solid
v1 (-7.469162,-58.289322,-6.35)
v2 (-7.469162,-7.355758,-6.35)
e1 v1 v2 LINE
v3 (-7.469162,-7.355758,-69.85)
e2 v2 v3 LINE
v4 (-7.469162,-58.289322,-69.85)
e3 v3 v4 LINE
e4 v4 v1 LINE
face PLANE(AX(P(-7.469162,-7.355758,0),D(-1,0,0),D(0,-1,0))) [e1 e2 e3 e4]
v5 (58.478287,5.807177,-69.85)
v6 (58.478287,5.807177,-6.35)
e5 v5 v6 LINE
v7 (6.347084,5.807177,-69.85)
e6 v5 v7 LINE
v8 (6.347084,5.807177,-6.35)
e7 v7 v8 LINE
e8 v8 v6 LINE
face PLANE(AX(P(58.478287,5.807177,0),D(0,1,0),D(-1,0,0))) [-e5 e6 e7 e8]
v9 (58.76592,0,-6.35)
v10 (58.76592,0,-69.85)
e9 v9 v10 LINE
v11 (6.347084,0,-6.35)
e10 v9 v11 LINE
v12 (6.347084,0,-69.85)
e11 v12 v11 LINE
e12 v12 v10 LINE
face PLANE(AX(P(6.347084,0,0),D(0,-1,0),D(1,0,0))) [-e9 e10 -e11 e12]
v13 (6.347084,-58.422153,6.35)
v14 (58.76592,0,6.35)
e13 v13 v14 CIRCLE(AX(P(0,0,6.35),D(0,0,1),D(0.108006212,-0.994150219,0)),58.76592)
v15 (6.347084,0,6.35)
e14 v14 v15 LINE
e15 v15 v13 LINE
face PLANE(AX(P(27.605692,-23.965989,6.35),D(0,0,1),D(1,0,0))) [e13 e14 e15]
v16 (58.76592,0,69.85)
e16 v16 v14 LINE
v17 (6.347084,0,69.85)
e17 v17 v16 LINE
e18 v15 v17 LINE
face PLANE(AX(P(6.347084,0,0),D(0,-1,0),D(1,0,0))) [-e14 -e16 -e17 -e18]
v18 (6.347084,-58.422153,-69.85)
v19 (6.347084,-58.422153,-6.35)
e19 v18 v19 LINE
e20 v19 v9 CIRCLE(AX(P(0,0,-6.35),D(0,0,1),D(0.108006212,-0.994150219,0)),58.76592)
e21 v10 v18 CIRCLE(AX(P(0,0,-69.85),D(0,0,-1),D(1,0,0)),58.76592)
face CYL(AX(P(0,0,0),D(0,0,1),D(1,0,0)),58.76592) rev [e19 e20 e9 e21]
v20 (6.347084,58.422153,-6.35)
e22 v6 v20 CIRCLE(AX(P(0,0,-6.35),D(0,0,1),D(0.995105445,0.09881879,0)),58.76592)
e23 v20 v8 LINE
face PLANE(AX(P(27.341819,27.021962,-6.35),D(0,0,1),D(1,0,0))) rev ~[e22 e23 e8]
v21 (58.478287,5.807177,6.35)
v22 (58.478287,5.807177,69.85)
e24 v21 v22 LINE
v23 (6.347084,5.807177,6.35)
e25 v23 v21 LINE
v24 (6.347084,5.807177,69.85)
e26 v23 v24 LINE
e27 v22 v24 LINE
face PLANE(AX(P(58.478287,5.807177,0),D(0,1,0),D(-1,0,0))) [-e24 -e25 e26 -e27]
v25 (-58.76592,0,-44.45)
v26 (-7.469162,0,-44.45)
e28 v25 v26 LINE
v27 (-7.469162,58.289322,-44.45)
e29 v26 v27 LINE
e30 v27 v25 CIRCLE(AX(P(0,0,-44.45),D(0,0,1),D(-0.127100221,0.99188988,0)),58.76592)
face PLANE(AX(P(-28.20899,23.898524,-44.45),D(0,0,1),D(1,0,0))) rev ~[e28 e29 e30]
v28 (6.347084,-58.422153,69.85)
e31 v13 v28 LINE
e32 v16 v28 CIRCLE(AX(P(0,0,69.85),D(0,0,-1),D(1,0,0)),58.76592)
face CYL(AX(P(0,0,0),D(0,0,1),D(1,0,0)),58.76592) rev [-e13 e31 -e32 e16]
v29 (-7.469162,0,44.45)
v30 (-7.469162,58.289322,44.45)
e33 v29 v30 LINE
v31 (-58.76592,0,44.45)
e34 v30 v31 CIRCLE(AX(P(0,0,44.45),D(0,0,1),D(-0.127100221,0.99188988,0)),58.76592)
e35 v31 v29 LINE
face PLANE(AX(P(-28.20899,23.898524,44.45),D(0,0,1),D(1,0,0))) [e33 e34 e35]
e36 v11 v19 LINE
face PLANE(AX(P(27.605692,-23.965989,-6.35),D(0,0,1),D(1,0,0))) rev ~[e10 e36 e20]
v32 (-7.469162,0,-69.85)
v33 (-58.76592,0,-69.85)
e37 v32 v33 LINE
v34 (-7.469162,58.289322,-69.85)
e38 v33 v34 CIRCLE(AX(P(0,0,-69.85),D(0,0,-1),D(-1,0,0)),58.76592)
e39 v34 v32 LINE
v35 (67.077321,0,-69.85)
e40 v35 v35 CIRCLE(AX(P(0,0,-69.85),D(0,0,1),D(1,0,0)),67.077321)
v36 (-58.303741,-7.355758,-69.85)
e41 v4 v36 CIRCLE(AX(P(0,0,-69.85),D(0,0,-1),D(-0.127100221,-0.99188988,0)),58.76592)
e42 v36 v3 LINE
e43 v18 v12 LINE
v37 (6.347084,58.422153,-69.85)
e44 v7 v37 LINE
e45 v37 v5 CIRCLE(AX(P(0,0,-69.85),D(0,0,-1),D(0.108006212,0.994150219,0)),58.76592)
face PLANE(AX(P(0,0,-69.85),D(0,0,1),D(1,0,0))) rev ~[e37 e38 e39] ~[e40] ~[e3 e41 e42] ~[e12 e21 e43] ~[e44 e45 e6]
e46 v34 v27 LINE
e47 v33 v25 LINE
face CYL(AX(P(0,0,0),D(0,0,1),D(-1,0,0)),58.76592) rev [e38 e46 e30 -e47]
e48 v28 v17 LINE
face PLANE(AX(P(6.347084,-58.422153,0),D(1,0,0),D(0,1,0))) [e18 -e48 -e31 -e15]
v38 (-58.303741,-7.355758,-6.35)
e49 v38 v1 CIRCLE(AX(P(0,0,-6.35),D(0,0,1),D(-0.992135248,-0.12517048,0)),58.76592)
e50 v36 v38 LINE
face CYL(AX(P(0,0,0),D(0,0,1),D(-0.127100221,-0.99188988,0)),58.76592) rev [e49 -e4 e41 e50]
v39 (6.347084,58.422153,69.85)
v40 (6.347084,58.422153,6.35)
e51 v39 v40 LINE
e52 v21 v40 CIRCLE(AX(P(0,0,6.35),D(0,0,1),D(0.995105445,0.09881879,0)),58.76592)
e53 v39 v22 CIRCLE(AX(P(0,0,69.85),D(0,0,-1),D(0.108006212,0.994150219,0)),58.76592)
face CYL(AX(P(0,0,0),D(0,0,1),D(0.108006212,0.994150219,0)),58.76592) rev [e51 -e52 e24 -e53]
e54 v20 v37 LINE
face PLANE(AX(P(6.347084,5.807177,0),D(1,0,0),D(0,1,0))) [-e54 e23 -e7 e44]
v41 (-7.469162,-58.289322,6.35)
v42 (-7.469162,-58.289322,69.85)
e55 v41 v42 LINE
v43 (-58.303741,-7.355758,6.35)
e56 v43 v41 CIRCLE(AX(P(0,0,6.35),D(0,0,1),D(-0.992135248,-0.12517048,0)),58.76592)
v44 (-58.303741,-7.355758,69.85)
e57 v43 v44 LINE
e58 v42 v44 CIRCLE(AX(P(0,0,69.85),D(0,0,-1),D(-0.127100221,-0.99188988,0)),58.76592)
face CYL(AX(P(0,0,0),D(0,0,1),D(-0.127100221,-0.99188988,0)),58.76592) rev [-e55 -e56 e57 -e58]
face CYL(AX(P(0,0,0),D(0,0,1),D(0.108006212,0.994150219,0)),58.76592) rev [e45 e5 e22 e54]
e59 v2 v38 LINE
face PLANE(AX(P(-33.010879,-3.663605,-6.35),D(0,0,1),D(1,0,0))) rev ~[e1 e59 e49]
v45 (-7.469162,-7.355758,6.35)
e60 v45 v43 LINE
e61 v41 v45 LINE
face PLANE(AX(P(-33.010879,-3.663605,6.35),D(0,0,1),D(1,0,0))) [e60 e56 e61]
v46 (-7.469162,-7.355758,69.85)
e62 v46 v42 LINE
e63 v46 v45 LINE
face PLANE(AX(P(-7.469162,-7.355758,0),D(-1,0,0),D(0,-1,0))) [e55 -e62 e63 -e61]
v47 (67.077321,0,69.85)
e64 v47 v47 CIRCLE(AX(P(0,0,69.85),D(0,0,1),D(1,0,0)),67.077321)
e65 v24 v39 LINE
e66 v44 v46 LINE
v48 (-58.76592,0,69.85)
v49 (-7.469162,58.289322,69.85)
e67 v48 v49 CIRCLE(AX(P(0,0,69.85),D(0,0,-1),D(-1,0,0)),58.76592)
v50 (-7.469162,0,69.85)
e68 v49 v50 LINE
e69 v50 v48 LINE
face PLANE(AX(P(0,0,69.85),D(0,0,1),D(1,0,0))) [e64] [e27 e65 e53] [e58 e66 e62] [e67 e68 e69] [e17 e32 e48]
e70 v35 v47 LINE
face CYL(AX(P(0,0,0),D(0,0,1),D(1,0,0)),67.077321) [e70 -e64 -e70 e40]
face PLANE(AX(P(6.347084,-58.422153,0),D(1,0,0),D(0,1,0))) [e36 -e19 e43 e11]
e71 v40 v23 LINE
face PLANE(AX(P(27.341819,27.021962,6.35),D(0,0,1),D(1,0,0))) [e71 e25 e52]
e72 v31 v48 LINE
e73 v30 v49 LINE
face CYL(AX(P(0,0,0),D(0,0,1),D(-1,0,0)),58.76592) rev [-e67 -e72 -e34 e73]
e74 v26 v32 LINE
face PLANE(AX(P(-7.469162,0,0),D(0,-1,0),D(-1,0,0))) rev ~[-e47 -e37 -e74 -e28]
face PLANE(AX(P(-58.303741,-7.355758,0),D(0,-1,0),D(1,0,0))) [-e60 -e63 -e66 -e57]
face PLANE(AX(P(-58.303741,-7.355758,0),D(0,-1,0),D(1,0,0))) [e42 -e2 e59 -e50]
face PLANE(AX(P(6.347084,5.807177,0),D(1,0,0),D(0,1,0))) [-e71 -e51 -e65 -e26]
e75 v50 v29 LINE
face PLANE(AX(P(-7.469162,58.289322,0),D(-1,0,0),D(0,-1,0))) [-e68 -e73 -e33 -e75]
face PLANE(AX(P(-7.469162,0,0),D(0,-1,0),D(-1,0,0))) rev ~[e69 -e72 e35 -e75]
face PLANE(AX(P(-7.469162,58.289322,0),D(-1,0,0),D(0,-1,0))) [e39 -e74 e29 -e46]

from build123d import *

# Parameters (mm, degrees)
F0_R     = 67.0773206954
F1_DEPTH = 69.85
F2_DEPTH = 6.35
F3_DEPTH = 44.45


# Not quite as in the source:
# - a feature names something its author has since deleted; it is built from what else it names


with BuildPart() as f1:
    # F0 (on Top) → F1 (new body, symmetric)
    with BuildSketch(Plane.XY):
        Circle(F0_R)
        with BuildLine():
            ThreePointArc((58.4782874441, 5.8071771637), (58.6939681668, 2.9071480599), (58.7659204727, 0))
            ThreePointArc((58.7659204727, 0), (43.7402884604, -39.2456440183), (6.3470844528, -58.4221527159))
            ThreePointArc((6.3470844528, -58.4221527159), (-0.5649559649, -58.7632047608), (-7.469161507, -58.2893217956))
            ThreePointArc((-7.469161507, -58.2893217956), (-41.5941780551, -41.5133443718), (-58.3037411026, -7.3557584547))
            ThreePointArc((-58.3037411026, -7.3557584547), (-58.6502618149, -3.6851320266), (-58.7659204727, 0))
            ThreePointArc((-58.7659204727, 0), (-44.1155616542, 38.8233258357), (-7.469161507, 58.2893217956))
            ThreePointArc((-7.469161507, 58.2893217956), (-0.5649559649, 58.7632047608), (6.3470844528, 58.4221527159))
            ThreePointArc((6.3470844528, 58.4221527159), (41.745252706, 41.3614226729), (58.4782874441, 5.8071771637))
        make_face(mode=Mode.SUBTRACT)
        with BuildLine():
            ThreePointArc((-7.469161507, -58.2893217956), (-0.5649559649, -58.7632047608), (6.3470844528, -58.4221527159))
            Line((6.3470844528, -58.4221527159), (6.3470844528, 0))
            Line((6.3470844528, 0), (6.3470844528, 5.8071771637))
            Line((6.3470844528, 5.8071771637), (6.3470844528, 58.4221527159))
            ThreePointArc((6.3470844528, 58.4221527159), (-0.5649559649, 58.7632047608), (-7.469161507, 58.2893217956))
            Line((-7.469161507, 58.2893217956), (-7.469161507, 0))
            Line((-7.469161507, 0), (-7.469161507, -7.3557584547))
            Line((-7.469161507, -7.3557584547), (-7.469161507, -58.2893217956))
        make_face()
        with BuildLine():
            Line((6.3470844528, 0), (58.7659204727, 0))
            ThreePointArc((58.7659204727, 0), (58.6939681668, 2.9071480599), (58.4782874441, 5.8071771637))
            Line((58.4782874441, 5.8071771637), (6.3470844528, 5.8071771637))
            Line((6.3470844528, 5.8071771637), (6.3470844528, 0))
        make_face()
        with BuildLine():
            ThreePointArc((-58.7659204727, 0), (-58.6502618149, -3.6851320266), (-58.3037411026, -7.3557584547))
            Line((-58.3037411026, -7.3557584547), (-7.469161507, -7.3557584547))
            Line((-7.469161507, -7.3557584547), (-7.469161507, 0))
            Line((-7.469161507, 0), (-58.7659204727, 0))
        make_face()
    extrude(amount=F1_DEPTH, both=True)

    # F0 (on Top) → F2 (join, symmetric)
    with BuildSketch(Plane.XY):
        with BuildLine():
            ThreePointArc((-58.7659204727, 0), (-58.6502618149, -3.6851320266), (-58.3037411026, -7.3557584547))
            Line((-58.3037411026, -7.3557584547), (-7.469161507, -7.3557584547))
            Line((-7.469161507, -7.3557584547), (-7.469161507, 0))
            Line((-7.469161507, 0), (-58.7659204727, 0))
        make_face()
        with BuildLine():
            Line((6.3470844528, 5.8071771637), (58.4782874441, 5.8071771637))
            ThreePointArc((58.4782874441, 5.8071771637), (41.745252706, 41.3614226729), (6.3470844528, 58.4221527159))
            Line((6.3470844528, 58.4221527159), (6.3470844528, 5.8071771637))
        make_face()
        with BuildLine():
            ThreePointArc((6.3470844528, -58.4221527159), (43.7402884604, -39.2456440183), (58.7659204727, 0))
            Line((58.7659204727, 0), (6.3470844528, 0))
            Line((6.3470844528, 0), (6.3470844528, -58.4221527159))
        make_face()
        with BuildLine():
            ThreePointArc((-58.3037411026, -7.3557584547), (-41.5941780551, -41.5133443718), (-7.469161507, -58.2893217956))
            Line((-7.469161507, -58.2893217956), (-7.469161507, -7.3557584547))
            Line((-7.469161507, -7.3557584547), (-58.3037411026, -7.3557584547))
        make_face()
    extrude(amount=F2_DEPTH, both=True)

    # F0 (on Top) → F3 (join, symmetric)
    with BuildSketch(Plane.XY):
        with BuildLine():
            Line((-7.469161507, 0), (-7.469161507, 58.2893217956))
            ThreePointArc((-7.469161507, 58.2893217956), (-44.1155616542, 38.8233258357), (-58.7659204727, 0))
            Line((-58.7659204727, 0), (-7.469161507, 0))
        make_face()
    extrude(amount=F3_DEPTH, both=True)


solid = f1.part
